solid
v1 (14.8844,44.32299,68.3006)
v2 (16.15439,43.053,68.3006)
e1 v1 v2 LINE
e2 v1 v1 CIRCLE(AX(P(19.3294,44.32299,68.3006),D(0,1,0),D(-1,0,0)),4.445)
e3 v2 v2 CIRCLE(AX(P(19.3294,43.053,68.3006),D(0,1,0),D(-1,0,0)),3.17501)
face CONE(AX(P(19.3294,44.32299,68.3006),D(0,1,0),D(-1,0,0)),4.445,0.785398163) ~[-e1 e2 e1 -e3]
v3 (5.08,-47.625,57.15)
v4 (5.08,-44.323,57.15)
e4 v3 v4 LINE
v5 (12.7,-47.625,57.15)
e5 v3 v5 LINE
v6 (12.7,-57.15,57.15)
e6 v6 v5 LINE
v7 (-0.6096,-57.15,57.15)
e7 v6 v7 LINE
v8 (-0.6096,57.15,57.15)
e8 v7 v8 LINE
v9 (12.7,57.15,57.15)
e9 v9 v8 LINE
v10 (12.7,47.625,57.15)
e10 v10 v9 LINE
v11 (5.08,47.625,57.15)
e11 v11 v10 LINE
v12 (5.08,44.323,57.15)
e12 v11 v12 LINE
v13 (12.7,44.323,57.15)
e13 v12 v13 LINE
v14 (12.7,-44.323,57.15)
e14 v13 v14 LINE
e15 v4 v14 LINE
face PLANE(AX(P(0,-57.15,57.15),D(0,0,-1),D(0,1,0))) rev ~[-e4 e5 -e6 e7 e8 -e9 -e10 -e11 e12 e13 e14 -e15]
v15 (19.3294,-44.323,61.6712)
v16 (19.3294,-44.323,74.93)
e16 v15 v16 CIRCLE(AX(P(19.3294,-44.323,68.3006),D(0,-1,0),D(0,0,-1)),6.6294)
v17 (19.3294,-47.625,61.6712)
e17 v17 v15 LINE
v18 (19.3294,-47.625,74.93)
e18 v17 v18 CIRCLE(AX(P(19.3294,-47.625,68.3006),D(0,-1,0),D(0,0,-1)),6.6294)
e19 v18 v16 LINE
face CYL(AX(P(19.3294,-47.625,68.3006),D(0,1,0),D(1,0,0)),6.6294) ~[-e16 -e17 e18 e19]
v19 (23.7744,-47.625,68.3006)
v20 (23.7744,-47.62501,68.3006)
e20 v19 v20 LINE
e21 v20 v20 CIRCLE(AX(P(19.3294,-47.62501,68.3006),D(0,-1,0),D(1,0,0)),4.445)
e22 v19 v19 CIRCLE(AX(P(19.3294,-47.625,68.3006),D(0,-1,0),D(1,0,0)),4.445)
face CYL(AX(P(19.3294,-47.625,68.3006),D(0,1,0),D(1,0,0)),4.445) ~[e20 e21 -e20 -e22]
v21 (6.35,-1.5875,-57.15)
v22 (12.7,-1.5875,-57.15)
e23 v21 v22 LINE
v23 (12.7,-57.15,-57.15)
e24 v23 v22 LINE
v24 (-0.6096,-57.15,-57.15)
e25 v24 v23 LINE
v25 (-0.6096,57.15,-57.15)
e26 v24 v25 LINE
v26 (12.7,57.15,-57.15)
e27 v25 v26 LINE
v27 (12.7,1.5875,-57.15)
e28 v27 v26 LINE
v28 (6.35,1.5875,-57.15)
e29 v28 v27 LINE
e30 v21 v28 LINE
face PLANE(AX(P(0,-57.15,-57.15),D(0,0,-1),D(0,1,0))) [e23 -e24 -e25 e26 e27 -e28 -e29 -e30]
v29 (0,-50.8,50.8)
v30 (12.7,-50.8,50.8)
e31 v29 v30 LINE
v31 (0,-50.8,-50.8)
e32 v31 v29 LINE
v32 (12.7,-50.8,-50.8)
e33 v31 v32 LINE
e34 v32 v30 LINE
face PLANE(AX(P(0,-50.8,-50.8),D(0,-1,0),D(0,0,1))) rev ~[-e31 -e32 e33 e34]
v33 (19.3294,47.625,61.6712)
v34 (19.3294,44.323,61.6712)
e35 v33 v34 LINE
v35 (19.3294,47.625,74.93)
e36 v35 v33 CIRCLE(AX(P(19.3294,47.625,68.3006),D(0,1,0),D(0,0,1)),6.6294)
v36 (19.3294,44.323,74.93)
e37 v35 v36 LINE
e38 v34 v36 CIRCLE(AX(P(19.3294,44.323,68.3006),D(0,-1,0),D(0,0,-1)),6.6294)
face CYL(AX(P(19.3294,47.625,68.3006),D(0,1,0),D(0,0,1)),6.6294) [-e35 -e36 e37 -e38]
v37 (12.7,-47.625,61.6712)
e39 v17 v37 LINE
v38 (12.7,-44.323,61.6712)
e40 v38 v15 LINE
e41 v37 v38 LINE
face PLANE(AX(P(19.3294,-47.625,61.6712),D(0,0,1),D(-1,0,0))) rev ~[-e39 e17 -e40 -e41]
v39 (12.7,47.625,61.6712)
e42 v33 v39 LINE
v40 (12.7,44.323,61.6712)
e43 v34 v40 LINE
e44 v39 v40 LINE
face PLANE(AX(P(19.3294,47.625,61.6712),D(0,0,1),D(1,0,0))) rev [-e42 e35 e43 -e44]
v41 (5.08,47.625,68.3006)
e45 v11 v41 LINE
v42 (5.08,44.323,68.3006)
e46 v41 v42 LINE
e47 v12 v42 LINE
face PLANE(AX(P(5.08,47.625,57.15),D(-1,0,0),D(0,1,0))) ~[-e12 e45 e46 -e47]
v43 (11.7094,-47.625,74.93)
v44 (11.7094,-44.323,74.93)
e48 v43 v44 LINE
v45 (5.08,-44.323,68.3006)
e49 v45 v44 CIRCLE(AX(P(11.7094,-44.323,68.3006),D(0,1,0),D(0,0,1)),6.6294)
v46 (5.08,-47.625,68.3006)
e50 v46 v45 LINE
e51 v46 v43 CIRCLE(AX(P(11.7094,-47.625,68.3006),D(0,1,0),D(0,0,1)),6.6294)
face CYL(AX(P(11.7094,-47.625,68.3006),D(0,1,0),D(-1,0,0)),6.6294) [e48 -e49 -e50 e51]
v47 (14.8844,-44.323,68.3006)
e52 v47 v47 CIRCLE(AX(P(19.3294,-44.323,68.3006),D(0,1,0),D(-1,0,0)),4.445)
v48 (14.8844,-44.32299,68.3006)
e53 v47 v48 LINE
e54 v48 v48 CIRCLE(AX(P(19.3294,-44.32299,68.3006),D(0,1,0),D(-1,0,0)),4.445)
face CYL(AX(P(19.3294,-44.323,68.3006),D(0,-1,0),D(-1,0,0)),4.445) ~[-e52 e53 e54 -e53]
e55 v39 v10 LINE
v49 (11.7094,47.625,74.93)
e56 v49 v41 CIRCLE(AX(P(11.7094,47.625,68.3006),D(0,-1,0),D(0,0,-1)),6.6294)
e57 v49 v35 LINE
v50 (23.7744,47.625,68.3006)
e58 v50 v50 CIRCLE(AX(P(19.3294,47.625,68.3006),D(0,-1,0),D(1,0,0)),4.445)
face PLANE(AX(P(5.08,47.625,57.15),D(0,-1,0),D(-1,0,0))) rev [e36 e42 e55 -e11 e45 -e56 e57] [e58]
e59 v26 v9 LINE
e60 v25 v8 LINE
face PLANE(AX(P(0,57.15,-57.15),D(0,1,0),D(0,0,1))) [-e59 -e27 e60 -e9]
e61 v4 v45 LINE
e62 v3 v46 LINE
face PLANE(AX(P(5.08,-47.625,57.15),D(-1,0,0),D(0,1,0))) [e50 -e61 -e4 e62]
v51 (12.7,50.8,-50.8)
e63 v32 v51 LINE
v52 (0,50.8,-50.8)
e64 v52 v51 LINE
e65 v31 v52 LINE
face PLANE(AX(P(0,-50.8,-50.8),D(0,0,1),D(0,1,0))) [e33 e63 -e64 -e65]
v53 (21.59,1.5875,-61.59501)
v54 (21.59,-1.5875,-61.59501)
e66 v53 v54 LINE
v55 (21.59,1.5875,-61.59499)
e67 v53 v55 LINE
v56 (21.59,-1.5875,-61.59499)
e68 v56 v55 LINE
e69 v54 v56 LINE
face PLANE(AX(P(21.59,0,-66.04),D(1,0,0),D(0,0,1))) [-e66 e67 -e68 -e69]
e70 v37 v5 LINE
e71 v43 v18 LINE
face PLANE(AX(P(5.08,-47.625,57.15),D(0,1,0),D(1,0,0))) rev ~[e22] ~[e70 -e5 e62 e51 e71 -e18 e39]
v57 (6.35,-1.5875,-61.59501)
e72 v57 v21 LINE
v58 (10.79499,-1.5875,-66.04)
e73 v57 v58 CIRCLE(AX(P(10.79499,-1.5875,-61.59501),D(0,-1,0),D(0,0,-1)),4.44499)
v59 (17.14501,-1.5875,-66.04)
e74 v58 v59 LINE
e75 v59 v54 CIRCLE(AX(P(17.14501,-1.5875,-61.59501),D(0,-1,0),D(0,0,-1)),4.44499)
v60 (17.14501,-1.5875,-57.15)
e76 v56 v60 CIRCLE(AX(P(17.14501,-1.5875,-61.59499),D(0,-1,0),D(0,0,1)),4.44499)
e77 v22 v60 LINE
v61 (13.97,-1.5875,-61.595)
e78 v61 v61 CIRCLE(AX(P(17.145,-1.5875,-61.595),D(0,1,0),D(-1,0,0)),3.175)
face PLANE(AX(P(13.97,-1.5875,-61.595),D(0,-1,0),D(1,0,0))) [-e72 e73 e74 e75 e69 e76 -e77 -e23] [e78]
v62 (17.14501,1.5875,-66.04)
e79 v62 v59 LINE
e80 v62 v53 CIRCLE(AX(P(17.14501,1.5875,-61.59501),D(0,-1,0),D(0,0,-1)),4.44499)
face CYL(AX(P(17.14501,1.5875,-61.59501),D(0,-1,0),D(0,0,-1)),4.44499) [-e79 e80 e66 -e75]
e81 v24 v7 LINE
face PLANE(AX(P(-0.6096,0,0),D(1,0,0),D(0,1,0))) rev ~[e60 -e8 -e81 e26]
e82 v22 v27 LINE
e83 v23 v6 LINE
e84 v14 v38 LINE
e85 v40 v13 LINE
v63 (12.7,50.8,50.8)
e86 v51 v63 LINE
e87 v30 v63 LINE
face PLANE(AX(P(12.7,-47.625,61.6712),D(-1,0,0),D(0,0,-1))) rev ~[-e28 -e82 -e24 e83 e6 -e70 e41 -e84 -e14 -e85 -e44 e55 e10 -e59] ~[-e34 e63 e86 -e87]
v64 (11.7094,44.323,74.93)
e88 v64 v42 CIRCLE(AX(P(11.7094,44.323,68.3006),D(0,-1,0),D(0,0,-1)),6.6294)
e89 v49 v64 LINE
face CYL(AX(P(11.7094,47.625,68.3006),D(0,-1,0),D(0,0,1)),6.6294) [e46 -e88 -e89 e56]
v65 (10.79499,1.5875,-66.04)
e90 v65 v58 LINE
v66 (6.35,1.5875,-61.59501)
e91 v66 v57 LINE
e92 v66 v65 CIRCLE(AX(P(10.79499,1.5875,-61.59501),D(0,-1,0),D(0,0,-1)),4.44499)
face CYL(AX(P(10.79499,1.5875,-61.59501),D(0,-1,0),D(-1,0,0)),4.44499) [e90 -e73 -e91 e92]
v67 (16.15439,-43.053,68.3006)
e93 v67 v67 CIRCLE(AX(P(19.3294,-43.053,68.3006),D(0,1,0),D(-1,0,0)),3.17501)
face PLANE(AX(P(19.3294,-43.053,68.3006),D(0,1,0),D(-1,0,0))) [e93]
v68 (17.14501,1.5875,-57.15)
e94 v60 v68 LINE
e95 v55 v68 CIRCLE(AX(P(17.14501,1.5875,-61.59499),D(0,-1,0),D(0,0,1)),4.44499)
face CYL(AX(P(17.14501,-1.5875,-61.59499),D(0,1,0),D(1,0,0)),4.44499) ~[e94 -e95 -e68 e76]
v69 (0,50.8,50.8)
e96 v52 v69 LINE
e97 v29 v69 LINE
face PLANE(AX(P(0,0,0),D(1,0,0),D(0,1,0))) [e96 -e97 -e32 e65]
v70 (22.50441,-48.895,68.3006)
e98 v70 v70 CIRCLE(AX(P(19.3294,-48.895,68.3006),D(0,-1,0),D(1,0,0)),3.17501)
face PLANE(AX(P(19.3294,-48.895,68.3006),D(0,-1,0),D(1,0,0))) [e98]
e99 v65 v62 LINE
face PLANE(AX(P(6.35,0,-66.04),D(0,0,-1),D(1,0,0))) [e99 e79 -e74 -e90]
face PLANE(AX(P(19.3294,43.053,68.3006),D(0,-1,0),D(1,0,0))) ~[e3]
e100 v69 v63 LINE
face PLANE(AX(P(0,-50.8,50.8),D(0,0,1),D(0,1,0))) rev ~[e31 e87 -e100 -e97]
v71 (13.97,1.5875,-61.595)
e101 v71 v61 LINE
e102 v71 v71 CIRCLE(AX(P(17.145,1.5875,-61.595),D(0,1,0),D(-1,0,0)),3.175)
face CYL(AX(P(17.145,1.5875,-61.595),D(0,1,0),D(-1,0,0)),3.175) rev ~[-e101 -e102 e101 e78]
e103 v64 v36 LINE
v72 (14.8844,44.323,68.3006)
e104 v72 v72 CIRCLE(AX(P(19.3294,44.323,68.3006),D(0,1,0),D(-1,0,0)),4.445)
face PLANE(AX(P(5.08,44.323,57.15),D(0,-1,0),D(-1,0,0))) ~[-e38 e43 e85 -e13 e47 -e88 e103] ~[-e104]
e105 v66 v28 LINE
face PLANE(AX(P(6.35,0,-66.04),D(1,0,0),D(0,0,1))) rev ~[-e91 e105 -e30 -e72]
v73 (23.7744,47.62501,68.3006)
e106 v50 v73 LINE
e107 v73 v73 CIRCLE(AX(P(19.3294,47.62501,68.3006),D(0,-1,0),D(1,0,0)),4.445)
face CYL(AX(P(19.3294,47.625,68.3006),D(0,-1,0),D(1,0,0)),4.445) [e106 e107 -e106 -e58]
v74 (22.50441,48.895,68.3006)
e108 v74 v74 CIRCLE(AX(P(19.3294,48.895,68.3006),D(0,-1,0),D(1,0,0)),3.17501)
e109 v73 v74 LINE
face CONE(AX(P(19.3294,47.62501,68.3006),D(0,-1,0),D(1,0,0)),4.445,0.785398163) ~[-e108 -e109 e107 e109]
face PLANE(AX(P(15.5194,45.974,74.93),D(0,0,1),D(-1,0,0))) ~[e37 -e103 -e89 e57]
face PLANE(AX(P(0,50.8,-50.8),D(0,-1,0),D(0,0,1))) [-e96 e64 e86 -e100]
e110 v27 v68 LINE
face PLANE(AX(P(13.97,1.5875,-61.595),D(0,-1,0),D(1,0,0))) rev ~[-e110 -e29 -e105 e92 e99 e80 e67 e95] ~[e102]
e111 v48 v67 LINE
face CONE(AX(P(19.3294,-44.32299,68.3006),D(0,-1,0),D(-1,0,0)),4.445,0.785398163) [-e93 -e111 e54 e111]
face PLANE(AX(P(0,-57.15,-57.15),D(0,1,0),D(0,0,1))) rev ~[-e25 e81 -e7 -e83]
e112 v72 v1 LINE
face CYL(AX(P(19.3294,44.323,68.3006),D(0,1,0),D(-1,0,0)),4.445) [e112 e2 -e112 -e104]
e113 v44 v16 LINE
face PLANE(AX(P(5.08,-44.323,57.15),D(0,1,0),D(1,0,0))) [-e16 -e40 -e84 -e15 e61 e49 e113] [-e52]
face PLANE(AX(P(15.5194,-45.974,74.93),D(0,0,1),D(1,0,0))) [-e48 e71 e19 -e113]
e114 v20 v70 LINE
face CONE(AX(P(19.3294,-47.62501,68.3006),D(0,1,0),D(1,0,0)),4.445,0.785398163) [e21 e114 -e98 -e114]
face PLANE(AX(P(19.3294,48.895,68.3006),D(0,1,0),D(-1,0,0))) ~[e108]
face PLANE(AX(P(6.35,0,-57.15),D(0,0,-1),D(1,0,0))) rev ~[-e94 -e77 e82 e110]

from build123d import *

# Parameters (mm, degrees)
F0_W      = 114.3
F0_H      = 114.3
F0_W_2    = 101.6
F0_H_2    = 101.6
F1_DEPTH  = 12.7
F2_W      = 114.3
F2_H      = 114.3
F3_DEPTH  = 0.6096
F4_W      = 20.8788
F4_H      = 3.302
F5_DEPTH  = 17.78
F6_R      = 6.6294
F8_DEPTH  = 6.35
F9_R      = 6.6294
F10_R     = 4.445
F11_DEPTH = 1.27
F12_R     = 4.445
F13_DEPTH = 1.27
F14_SIZE  = 1.26999
F15_W     = 15.24
F15_H     = 8.89
F16_DEPTH = 1.5875
F17_R     = 4.44499
F18_R     = 3.175
F19_DEPTH = 25.4


# Not quite as in the source:
# - a fillet or chamfer is up to 0.001 mm smaller than in the source, because OpenCascade refuses the exact size
# - a pattern or mirror of a feature is missing from the dataset's text; its kind, count and spacing are read off the source's solid


with BuildPart() as f1:
    # F0 (on Right) → F1 (new body)
    with BuildSketch(Plane.YZ):
        Rectangle(F0_W, F0_H)
        Rectangle(F0_W_2, F0_H_2, mode=Mode.SUBTRACT)
    extrude(amount=F1_DEPTH)

    # F2 (on Right) → F3 (join)
    with BuildSketch(Plane.YZ):
        Rectangle(F2_W, F2_H)
    extrude(amount=-F3_DEPTH)

    # F4 (on face) → F5 (join)
    with BuildSketch(Plane.XY.offset(57.15)):
        with Locations((15.5194, -45.974)):
            Rectangle(F4_W, F4_H)
    f5 = extrude(amount=F5_DEPTH)

    # F5_copies: F5 across plane
    add(f5.mirror(Plane.ZX))

    # F6
    f6_edges = [f1.edges().sort_by_distance(p)[0] for p in [
        (25.9588, -45.974, 74.93),
    ]]
    fillet(f6_edges, radius=F6_R)

    # F7 (on face) → F8 (cut)
    with BuildSketch(Plane.XZ.offset(47.625)):
        with BuildLine():
            ThreePointArc((19.3294, 74.93), (25.9588, 68.3006), (19.3294, 61.6712))
            Line((19.3294, 61.6712), (12.7, 61.6712))
            Line((12.7, 61.6712), (12.7, 57.15))
            Line((12.7, 57.15), (28.7029210806, 51.0326394975))
            Line((28.7029210806, 51.0326394975), (31.0219925225, 81.4440133214))
            Line((31.0219925225, 81.4440133214), (19.3294, 74.93))
        make_face()
    f8 = extrude(amount=-F8_DEPTH, mode=Mode.SUBTRACT)

    # F8_copies: F8 across plane
    add(f8.mirror(Plane.ZX), mode=Mode.SUBTRACT)

    # F9
    f9_edges = [f1.edges().sort_by_distance(p)[0] for p in [
        (5.08, -45.974, 74.93),
        (5.08, 45.974, 74.93),
    ]]
    fillet(f9_edges, radius=F9_R)

    # F10 (on face) → F11 (join)
    with BuildSketch(Plane.XZ.offset(47.625)):
        with Locations((19.3294, 68.3006)):
            Circle(F10_R)
    f11 = extrude(amount=F11_DEPTH)

    # F11_copies: F11 across plane
    add(f11.mirror(Plane.ZX))

    # F12 (on face) → F13 (join)
    with BuildSketch(Plane(origin=(0, -44.323, 0), x_dir=(-1, 0, 0), z_dir=(0, 1, 0))):
        with Locations((-19.3294, 68.3006)):
            Circle(F12_R)
    f13 = extrude(amount=F13_DEPTH)

    # F13_copies: F13 across plane
    add(f13.mirror(Plane.ZX))

    # F14 (size 1.27 in the source; OpenCascade refuses exactly that, so slightly less here)
    f14_edges = [f1.edges().sort_by_distance(p)[0] for p in [
        (14.8844, -48.895, 68.3006),
        (23.7744, -43.053, 68.3006),
        (14.8844, 48.895, 68.3006),
        (23.7744, 43.053, 68.3006),
    ]]
    chamfer(f14_edges, length=F14_SIZE)

    # F15 (on Front) → F16 (join, symmetric)
    with BuildSketch(Plane.XZ):
        with Locations((13.97, -61.595)):
            Rectangle(F15_W, F15_H)
    extrude(amount=F16_DEPTH, both=True)

    # F17 (radius 4.445 in the source; OpenCascade refuses exactly that, so slightly less here)
    f17_edges = [f1.edges().sort_by_distance(p)[0] for p in [
        (21.59, 0, -57.15),
        (21.59, 0, -66.04),
        (6.35, 0, -66.04),
    ]]
    fillet(f17_edges, radius=F17_R)

    # F18 (on face) → F19 (cut)
    with BuildSketch(Plane(origin=(0, 1.5875, 0), x_dir=(-1, 0, 0), z_dir=(0, 1, 0))):
        with Locations((-17.145, -61.595)):
            Circle(F18_R)
    extrude(amount=-F19_DEPTH, mode=Mode.SUBTRACT)


solid = f1.part
